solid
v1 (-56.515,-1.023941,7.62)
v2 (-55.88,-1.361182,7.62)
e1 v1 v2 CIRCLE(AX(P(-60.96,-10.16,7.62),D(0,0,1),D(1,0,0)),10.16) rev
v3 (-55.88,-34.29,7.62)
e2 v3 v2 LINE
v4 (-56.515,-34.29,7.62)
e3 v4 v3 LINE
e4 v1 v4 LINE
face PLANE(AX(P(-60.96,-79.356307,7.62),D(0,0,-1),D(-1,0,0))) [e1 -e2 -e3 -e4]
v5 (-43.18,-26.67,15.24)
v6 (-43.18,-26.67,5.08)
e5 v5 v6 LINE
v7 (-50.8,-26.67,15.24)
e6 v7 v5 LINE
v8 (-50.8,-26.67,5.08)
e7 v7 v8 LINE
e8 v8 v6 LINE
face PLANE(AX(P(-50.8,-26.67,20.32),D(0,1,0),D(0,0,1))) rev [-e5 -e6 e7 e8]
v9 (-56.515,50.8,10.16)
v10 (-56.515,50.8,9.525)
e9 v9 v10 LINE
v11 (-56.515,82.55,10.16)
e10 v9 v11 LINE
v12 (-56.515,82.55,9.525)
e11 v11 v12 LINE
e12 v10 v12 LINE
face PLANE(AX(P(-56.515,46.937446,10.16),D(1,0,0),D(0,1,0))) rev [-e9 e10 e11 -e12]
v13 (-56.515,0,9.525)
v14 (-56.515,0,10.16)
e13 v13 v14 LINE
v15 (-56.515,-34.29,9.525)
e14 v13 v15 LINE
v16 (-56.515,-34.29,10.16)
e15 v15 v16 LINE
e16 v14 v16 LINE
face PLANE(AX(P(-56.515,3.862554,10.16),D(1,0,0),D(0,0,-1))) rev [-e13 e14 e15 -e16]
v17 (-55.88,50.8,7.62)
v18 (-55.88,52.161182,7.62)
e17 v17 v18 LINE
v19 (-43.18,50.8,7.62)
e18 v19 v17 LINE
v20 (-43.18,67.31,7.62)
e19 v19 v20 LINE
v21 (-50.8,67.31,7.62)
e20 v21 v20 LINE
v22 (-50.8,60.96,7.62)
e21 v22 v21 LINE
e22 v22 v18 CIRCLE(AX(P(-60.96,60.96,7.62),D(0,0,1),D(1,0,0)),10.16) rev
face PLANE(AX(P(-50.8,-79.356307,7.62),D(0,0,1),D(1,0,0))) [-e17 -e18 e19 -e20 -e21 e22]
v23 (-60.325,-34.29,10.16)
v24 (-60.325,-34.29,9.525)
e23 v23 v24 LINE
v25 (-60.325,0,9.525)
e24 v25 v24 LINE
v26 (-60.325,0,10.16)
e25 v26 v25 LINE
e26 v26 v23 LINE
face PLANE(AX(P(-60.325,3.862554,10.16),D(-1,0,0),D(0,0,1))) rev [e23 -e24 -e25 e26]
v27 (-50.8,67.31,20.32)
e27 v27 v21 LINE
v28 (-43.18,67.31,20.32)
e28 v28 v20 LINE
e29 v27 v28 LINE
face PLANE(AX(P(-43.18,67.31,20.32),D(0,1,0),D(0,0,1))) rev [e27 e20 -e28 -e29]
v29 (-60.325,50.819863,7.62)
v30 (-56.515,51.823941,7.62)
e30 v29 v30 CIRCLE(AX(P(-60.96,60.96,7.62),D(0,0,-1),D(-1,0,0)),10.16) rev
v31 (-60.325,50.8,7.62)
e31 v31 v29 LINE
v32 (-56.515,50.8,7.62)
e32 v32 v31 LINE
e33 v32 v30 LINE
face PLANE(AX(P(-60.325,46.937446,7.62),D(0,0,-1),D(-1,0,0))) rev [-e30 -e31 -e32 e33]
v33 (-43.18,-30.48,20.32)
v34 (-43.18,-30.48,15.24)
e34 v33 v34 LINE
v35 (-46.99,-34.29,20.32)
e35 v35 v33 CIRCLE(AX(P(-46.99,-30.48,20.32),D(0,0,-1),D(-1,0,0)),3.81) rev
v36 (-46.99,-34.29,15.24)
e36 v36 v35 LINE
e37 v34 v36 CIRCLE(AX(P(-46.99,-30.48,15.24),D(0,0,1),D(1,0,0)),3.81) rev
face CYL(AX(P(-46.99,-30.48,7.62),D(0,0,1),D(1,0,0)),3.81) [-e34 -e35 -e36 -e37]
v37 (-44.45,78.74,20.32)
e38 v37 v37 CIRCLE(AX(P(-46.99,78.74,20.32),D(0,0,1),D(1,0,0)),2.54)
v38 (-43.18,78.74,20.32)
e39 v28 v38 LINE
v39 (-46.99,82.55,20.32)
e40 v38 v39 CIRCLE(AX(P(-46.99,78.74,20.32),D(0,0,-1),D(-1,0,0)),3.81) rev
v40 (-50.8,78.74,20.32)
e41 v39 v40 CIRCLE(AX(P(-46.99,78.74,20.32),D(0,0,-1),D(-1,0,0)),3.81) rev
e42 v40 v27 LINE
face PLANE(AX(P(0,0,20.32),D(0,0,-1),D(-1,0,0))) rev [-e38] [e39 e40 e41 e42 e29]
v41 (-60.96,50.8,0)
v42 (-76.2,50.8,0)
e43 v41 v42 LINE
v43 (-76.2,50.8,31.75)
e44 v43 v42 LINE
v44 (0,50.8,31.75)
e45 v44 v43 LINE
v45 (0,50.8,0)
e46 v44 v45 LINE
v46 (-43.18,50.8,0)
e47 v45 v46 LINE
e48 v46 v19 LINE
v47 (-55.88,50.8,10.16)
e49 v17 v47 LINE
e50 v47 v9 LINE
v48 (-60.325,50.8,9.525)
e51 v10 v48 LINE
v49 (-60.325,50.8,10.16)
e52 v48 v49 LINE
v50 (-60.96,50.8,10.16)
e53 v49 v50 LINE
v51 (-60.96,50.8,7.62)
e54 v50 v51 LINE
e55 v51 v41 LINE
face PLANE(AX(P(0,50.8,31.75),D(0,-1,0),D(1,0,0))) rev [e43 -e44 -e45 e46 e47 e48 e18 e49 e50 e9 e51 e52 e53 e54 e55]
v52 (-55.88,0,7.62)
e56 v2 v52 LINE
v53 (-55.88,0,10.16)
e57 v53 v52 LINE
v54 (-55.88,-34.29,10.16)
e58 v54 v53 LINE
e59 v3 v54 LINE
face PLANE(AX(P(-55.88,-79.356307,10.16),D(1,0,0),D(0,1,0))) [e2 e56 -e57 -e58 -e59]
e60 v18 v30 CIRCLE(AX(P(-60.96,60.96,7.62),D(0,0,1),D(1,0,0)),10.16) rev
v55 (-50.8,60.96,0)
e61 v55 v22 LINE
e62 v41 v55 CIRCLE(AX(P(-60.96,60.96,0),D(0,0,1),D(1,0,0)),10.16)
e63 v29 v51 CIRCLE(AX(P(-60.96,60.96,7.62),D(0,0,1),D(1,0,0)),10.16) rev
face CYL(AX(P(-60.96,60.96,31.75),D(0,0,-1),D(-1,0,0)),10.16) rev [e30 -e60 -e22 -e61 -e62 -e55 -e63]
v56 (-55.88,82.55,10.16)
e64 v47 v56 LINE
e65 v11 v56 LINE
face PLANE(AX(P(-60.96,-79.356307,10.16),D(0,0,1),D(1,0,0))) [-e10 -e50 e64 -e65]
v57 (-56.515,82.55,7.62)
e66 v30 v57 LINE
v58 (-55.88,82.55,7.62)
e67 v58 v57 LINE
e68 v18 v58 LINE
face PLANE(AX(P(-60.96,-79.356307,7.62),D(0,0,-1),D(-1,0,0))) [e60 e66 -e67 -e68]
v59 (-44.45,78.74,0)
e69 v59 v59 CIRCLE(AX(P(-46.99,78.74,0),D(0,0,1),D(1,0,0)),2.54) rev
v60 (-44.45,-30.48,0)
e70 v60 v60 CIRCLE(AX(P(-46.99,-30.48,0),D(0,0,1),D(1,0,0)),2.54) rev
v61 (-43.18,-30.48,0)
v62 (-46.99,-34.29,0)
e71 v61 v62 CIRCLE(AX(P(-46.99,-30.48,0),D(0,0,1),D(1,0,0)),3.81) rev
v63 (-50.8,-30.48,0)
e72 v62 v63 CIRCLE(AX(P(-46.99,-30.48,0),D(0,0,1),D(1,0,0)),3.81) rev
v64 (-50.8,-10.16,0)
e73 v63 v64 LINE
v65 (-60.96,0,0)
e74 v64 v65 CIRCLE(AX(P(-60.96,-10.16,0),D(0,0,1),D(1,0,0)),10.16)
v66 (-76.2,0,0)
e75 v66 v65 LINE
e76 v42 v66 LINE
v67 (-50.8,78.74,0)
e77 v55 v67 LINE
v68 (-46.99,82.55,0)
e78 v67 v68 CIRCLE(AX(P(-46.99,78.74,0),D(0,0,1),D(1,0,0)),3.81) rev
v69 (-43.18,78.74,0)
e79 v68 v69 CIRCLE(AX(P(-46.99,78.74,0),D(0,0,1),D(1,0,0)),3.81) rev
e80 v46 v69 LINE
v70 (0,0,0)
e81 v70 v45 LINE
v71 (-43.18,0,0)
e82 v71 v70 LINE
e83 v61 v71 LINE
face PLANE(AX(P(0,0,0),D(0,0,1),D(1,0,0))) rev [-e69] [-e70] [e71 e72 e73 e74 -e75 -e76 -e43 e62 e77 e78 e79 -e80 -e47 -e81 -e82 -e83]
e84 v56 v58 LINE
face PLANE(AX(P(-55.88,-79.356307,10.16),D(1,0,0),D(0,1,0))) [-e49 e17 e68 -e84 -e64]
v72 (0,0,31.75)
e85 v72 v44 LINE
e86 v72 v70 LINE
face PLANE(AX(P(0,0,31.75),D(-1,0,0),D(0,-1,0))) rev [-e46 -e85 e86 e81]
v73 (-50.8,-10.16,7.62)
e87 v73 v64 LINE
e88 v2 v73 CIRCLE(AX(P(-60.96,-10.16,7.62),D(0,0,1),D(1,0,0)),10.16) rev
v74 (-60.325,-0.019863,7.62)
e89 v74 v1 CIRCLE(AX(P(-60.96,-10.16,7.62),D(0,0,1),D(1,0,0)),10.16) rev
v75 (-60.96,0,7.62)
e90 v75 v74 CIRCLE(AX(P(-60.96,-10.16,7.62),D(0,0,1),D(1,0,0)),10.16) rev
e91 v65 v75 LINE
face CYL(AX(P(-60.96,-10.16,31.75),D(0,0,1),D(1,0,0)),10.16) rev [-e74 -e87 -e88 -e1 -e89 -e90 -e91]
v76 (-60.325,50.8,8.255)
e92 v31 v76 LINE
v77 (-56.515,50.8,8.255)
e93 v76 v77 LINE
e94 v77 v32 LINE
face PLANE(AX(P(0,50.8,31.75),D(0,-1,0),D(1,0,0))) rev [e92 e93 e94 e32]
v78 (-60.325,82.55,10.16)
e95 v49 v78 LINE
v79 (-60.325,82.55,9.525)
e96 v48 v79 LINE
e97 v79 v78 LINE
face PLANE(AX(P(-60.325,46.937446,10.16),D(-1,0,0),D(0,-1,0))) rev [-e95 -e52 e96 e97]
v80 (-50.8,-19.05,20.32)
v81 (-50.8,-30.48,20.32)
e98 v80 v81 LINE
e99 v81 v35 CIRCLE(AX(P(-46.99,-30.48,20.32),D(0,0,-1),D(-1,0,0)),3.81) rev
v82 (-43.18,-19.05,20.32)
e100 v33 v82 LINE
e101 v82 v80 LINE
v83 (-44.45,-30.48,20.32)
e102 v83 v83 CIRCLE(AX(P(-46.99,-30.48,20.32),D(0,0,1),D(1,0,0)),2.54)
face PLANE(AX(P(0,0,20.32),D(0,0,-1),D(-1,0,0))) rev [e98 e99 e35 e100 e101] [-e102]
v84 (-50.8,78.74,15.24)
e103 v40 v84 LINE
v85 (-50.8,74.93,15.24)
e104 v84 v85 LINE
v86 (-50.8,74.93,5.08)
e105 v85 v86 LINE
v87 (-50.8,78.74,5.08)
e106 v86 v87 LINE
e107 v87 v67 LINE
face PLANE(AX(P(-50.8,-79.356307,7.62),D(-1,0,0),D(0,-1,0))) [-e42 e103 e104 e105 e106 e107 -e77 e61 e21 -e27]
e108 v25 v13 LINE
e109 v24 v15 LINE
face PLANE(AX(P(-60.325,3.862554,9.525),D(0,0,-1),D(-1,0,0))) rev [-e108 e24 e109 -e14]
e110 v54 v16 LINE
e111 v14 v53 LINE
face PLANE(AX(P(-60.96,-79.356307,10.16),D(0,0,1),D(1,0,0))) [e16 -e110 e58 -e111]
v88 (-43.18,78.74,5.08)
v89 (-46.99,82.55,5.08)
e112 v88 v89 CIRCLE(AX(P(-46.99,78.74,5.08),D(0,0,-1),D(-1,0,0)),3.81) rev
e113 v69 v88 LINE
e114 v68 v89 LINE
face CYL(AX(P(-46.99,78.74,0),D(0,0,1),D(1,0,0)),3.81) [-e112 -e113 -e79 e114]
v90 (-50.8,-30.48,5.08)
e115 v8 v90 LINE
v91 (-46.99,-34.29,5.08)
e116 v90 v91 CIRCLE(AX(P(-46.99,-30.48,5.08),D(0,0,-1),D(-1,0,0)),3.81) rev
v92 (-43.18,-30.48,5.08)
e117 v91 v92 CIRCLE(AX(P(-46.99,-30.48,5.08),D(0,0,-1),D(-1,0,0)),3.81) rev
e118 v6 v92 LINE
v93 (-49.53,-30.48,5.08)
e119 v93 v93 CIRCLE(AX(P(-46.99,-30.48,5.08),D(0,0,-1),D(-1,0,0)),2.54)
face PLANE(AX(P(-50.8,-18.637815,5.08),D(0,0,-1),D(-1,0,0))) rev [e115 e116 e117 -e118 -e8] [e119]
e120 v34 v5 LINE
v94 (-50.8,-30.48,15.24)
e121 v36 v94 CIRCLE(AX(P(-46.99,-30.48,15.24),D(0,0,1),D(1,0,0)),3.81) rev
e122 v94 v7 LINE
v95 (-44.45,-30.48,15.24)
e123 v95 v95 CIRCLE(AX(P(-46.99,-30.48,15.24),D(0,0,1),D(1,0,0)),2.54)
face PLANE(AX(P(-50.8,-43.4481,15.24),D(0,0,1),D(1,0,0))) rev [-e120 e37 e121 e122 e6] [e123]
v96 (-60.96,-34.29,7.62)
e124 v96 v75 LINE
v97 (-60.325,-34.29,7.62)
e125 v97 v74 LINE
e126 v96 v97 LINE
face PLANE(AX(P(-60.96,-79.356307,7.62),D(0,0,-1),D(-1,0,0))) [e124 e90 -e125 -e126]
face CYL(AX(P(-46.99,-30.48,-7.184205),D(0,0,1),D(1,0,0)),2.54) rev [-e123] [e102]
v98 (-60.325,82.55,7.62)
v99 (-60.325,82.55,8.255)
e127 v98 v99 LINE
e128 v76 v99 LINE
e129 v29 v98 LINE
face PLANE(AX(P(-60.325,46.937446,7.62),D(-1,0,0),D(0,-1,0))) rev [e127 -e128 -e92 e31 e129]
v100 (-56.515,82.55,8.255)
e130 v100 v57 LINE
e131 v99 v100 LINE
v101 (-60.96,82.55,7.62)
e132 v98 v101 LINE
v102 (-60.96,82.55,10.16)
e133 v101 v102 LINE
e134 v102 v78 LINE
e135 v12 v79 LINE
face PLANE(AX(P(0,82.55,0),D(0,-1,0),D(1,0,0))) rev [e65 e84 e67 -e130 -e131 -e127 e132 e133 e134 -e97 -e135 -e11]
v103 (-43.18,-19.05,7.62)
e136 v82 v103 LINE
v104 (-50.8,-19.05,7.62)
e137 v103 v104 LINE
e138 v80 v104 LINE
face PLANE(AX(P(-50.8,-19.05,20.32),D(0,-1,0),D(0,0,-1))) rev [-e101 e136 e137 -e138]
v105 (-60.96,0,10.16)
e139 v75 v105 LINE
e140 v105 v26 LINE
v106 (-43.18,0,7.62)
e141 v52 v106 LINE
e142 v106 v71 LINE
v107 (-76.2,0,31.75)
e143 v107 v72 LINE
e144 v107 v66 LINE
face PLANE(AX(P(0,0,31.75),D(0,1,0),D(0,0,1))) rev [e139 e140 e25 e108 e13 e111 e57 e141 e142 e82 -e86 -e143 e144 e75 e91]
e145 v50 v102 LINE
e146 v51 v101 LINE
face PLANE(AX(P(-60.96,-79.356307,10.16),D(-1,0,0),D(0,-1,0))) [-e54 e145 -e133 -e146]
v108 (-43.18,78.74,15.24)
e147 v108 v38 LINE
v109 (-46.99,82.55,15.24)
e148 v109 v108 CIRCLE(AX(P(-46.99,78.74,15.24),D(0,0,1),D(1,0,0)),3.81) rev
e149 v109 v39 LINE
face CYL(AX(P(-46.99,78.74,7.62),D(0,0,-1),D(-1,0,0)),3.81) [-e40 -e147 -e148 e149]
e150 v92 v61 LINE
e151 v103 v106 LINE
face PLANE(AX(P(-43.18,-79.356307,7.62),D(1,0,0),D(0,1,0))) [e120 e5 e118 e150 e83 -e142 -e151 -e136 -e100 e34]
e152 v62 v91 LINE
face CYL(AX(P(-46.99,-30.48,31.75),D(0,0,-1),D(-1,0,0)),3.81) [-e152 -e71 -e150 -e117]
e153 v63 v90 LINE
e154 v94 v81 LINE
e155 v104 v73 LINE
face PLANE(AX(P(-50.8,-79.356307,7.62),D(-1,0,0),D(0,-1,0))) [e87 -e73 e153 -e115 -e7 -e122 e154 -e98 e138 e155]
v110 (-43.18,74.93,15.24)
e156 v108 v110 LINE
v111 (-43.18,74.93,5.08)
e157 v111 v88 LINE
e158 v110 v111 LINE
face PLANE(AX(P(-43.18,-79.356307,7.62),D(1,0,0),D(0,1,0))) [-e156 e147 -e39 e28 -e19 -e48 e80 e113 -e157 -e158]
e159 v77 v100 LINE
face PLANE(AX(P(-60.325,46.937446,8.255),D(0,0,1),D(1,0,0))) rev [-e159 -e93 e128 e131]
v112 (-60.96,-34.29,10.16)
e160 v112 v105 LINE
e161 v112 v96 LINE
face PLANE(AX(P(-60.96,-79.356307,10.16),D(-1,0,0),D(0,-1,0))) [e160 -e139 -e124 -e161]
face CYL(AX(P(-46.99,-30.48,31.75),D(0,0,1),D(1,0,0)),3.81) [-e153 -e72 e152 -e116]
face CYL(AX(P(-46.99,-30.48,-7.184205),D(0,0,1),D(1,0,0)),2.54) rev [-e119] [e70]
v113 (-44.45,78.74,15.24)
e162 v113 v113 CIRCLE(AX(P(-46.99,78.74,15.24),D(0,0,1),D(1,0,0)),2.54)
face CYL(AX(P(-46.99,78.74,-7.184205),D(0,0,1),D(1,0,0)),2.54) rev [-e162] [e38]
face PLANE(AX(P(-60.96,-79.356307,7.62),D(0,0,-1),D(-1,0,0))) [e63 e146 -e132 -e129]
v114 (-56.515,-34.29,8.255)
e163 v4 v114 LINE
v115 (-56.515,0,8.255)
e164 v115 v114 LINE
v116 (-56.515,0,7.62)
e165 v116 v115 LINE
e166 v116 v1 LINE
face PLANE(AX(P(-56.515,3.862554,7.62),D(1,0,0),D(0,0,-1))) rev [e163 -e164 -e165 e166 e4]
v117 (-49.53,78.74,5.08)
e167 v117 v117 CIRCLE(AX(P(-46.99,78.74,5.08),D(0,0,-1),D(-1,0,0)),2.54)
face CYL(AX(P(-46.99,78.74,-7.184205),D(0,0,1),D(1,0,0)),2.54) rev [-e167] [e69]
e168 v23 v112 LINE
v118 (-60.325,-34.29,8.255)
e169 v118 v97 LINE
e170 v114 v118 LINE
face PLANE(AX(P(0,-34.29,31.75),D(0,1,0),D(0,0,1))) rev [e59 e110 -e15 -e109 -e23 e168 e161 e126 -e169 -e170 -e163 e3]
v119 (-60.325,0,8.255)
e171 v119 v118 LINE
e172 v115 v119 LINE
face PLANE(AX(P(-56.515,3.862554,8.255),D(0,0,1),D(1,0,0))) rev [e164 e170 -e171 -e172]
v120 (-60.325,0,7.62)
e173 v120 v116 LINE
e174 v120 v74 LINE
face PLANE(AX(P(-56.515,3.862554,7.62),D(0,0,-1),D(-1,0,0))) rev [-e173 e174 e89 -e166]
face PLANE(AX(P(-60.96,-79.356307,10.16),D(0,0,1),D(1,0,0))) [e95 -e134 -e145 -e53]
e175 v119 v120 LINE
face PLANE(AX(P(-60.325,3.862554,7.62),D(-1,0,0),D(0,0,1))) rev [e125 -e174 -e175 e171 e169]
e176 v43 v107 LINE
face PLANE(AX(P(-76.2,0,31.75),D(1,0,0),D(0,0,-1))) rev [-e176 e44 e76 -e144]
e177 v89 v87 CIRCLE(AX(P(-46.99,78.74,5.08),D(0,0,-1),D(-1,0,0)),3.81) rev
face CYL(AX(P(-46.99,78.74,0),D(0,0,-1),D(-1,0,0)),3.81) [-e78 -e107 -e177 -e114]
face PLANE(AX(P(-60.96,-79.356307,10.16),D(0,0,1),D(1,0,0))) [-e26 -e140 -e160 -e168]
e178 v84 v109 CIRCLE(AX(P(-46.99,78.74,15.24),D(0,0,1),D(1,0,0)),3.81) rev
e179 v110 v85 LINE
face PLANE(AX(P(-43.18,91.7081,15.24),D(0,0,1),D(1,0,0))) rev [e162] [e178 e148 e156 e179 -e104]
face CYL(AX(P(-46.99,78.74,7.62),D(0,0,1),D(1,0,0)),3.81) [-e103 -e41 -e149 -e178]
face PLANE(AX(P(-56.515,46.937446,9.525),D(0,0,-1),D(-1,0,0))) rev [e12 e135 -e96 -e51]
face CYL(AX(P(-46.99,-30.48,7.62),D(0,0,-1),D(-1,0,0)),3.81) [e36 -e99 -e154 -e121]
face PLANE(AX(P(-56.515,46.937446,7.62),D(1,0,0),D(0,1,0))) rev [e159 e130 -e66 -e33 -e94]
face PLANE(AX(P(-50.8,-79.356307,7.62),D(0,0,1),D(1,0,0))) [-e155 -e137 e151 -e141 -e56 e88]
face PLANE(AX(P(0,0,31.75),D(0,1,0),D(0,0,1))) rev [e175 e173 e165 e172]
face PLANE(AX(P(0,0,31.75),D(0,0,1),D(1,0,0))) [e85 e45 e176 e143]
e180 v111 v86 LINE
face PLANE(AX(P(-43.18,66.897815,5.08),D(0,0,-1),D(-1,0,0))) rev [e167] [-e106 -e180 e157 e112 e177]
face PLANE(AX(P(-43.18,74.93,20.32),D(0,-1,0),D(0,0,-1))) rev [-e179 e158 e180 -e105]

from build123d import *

# Parameters (mm, degrees)
SKETCH1_W                = 76.2
SKETCH1_H                = 50.8
BOSS_EXTRUDE1_DEPTH      = 31.75
BOSS_EXTRUDE2_DEPTH      = 31.75
BOSS_EXTRUDE2_DEPTH_BACK = 85.09
SKETCH4_W                = 5.08
SKETCH4_H                = 2.54
SKETCH4_W_2              = 7.62
SKETCH4_H_2              = 7.62
FILLET1_R                = 10.16
SKETCH5_W                = 7.62
SKETCH5_H                = 7.62
BOSS_EXTRUDE3_DEPTH      = 12.7
SKETCH6_W                = 7.62
SKETCH6_H                = 2.54
CUT_EXTRUDE1_DEPTH       = 7.62
SKETCH7_W                = 7.62
SKETCH7_H                = 2.54
CUT_EXTRUDE2_DEPTH       = 7.62
SKETCH9_W                = 7.62
SKETCH9_H                = 5.08
BOSS_EXTRUDE4_DEPTH      = 7.62
SKETCH10_W               = 7.62
SKETCH10_H               = 5.08
BOSS_EXTRUDE5_DEPTH      = 7.62
FILLET2_R                = 3.81
CUT_EXTRUDE3_REACH       = 116.166
SKETCH11_R               = 2.54
CUT_EXTRUDE4_REACH       = 116.166
SKETCH12_R               = 2.54
CUT_EXTRUDE5_REACH       = 145.06
SKETCH13_W               = 3.81
SKETCH13_H               = 0.635
SKETCH14_W               = 3.81
SKETCH14_H               = 0.635
CUT_EXTRUDE6_DEPTH       = 34.29


# Some blends are built 0.0001 mm under size
with BuildPart() as part:
    # Sketch1 → Boss-Extrude1 (new body)
    with BuildSketch(Plane.XY):
        with Locations((-38.1, 25.4)):
            Rectangle(SKETCH1_W, SKETCH1_H)
    extrude(amount=BOSS_EXTRUDE1_DEPTH)

    # Sketch4 → Boss-Extrude2 (add, two sides: drawn at the far end of the back side and taken through both)
    with BuildSketch(Plane(origin=(0, 50.8, 0), x_dir=(1, 0, 0), z_dir=(0, 1, 0)).offset(-BOSS_EXTRUDE2_DEPTH_BACK)):
        with Locations((-58.42, -8.89)):
            Rectangle(SKETCH4_W, SKETCH4_H)
        with Locations((-46.99, -3.81)):
            Rectangle(SKETCH4_W_2, SKETCH4_H_2)
    extrude(amount=BOSS_EXTRUDE2_DEPTH + BOSS_EXTRUDE2_DEPTH_BACK)

    # Fillet1
    # the kernel refuses this fillet: 10.16 mm, written as the material it adds along each edge
    with BuildSketch(Plane(origin=(-50.8, 50.8, 7.62), x_dir=(-1, 0, 0), z_dir=(0, 0, -1)), Plane(origin=(-50.8, 0, 0), x_dir=(-1, 0, 0), z_dir=(0, 0, 1))) as fillet1_piece_1:
        with BuildLine():
            CenterArc((FILLET1_R, FILLET1_R), FILLET1_R, 180, 90)
            Line((0, FILLET1_R), (0, 0))
            Line((0, 0), (FILLET1_R, 0))
        make_face()
    extrude(amount=7.62)

    # Sketch5 → Boss-Extrude3 (add)
    with BuildSketch(Plane.XY.offset(7.62)):
        with Locations((-46.99, 71.12)):
            Rectangle(SKETCH5_W, SKETCH5_H)
        with Locations((-46.99, -22.86)):
            Rectangle(SKETCH5_W, SKETCH5_H)
    extrude(amount=BOSS_EXTRUDE3_DEPTH)

    # Sketch6 → Cut-Extrude1 (cut)
    with BuildSketch(Plane.XZ.offset(34.29)):
        with Locations((-46.99, 6.35)):
            Rectangle(SKETCH6_W, SKETCH6_H)
    extrude(amount=-CUT_EXTRUDE1_DEPTH, mode=Mode.SUBTRACT)

    # Sketch7 → Cut-Extrude2 (cut)
    with BuildSketch(Plane(origin=(0, 82.55, 0), x_dir=(1, 0, 0), z_dir=(0, 1, 0))):
        with Locations((-46.99, -6.35)):
            Rectangle(SKETCH7_W, SKETCH7_H)
    extrude(amount=-CUT_EXTRUDE2_DEPTH, mode=Mode.SUBTRACT)

    # Sketch9 → Boss-Extrude4 (add)
    with BuildSketch(Plane(origin=(0, -26.67, 0), x_dir=(-1, 0, 0), z_dir=(0, -1, 0))):
        with Locations((46.99, -17.78)):
            Rectangle(SKETCH9_W, SKETCH9_H)
    extrude(amount=BOSS_EXTRUDE4_DEPTH)

    # Sketch10 → Boss-Extrude5 (add)
    with BuildSketch(Plane(origin=(0, 74.93, 0), x_dir=(1, 0, 0), z_dir=(0, 1, 0))):
        with Locations((-46.99, -17.78)):
            Rectangle(SKETCH10_W, SKETCH10_H)
    extrude(amount=BOSS_EXTRUDE5_DEPTH)

    # Fillet2
    fillet2_edges = [part.edges().sort_by_distance(p)[0] for p in [
        (-43.18, 82.55, 2.54),
        (-50.8, 82.55, 2.54),
        (-43.18, 82.55, 17.78),
        (-50.8, 82.55, 17.78),
        (-50.8, -34.29, 2.54),
        (-43.18, -34.29, 2.54),
        (-50.8, -34.29, 17.78),
        (-43.18, -34.29, 17.78),
    ]]
    fillet(fillet2_edges, radius=FILLET2_R - 0.0001)  # a hair under: the kernel refuses the full size

    # Cut-Extrude3: up to this face of the body (flat: up to its plane)
    cut_extrude3_end = Plane(part.part.faces().sort_by_distance((-39.240735796, 25.146964219, 0))[0])
    # Sketch11 → Cut-Extrude3 (cut, up to the picked face)
    with BuildSketch(Plane.XY.offset(20.32), mode=Mode.PRIVATE) as cut_extrude3_sk1:
        with Locations((-46.99, 78.74)):
            Circle(SKETCH11_R)
    cut_extrude3_tool1 = split(extrude(cut_extrude3_sk1.sketch, amount=-CUT_EXTRUDE3_REACH, mode=Mode.PRIVATE), bisect_by=cut_extrude3_end, keep=Keep.BOTH, mode=Mode.PRIVATE)
    add(cut_extrude3_tool1.solids().sort_by(Axis((-46.99, 78.74, 20.32), (0, 0, -1)))[0], mode=Mode.SUBTRACT)

    # Cut-Extrude4: up to this face of the body (flat: up to its plane)
    cut_extrude4_end = Plane(part.part.faces().sort_by_distance((-39.204923448, 24.89929007, 0))[0])
    # Sketch12 → Cut-Extrude4 (cut, up to the picked face)
    with BuildSketch(Plane.XY.offset(20.32), mode=Mode.PRIVATE) as cut_extrude4_sk1:
        with Locations((-46.99, -30.48)):
            Circle(SKETCH12_R)
    cut_extrude4_tool1 = split(extrude(cut_extrude4_sk1.sketch, amount=-CUT_EXTRUDE4_REACH, mode=Mode.PRIVATE), bisect_by=cut_extrude4_end, keep=Keep.BOTH, mode=Mode.PRIVATE)
    add(cut_extrude4_tool1.solids().sort_by(Axis((-46.99, -30.48, 20.32), (0, 0, -1)))[0], mode=Mode.SUBTRACT)

    # Cut-Extrude5: up to this face of the body (flat: up to its plane)
    cut_extrude5_end = Plane(part.part.faces().sort_by_distance((-37.151107955, 50.8, 16.634474432))[0])
    # Sketch13 → Cut-Extrude5 (cut, up to the picked face)
    with BuildSketch(Plane(origin=(0, 82.55, 0), x_dir=(1, 0, 0), z_dir=(0, 1, 0)), mode=Mode.PRIVATE) as cut_extrude5_sk1:
        with Locations((-58.42, -9.8425)):
            Rectangle(SKETCH13_W, SKETCH13_H)
    cut_extrude5_tool1 = split(extrude(cut_extrude5_sk1.sketch, amount=-CUT_EXTRUDE5_REACH, mode=Mode.PRIVATE), bisect_by=cut_extrude5_end, keep=Keep.BOTH, mode=Mode.PRIVATE)
    # Sketch13 → Cut-Extrude5 (cut, up to the picked face)
    with BuildSketch(Plane(origin=(0, 82.55, 0), x_dir=(1, 0, 0), z_dir=(0, 1, 0)), mode=Mode.PRIVATE) as cut_extrude5_sk2:
        with Locations((-58.42, -7.9375)):
            Rectangle(SKETCH13_W, SKETCH13_H)
    cut_extrude5_tool2 = split(extrude(cut_extrude5_sk2.sketch, amount=-CUT_EXTRUDE5_REACH, mode=Mode.PRIVATE), bisect_by=cut_extrude5_end, keep=Keep.BOTH, mode=Mode.PRIVATE)
    add(cut_extrude5_tool1.solids().sort_by(Axis((-58.42, 82.55, 9.8425), (0, -1, 0)))[0], mode=Mode.SUBTRACT)
    add(cut_extrude5_tool2.solids().sort_by(Axis((-58.42, 82.55, 7.9375), (0, -1, 0)))[0], mode=Mode.SUBTRACT)

    # Sketch14 → Cut-Extrude6 (cut)
    with BuildSketch(Plane(origin=(0, -34.29, 0), x_dir=(-1, 0, 0), z_dir=(0, -1, 0))):
        with Locations((58.42, -9.8425)):
            Rectangle(SKETCH14_W, SKETCH14_H)
        with Locations((58.42, -7.9375)):
            Rectangle(SKETCH14_W, SKETCH14_H)
    extrude(amount=-CUT_EXTRUDE6_DEPTH, mode=Mode.SUBTRACT)


solid = part.part
